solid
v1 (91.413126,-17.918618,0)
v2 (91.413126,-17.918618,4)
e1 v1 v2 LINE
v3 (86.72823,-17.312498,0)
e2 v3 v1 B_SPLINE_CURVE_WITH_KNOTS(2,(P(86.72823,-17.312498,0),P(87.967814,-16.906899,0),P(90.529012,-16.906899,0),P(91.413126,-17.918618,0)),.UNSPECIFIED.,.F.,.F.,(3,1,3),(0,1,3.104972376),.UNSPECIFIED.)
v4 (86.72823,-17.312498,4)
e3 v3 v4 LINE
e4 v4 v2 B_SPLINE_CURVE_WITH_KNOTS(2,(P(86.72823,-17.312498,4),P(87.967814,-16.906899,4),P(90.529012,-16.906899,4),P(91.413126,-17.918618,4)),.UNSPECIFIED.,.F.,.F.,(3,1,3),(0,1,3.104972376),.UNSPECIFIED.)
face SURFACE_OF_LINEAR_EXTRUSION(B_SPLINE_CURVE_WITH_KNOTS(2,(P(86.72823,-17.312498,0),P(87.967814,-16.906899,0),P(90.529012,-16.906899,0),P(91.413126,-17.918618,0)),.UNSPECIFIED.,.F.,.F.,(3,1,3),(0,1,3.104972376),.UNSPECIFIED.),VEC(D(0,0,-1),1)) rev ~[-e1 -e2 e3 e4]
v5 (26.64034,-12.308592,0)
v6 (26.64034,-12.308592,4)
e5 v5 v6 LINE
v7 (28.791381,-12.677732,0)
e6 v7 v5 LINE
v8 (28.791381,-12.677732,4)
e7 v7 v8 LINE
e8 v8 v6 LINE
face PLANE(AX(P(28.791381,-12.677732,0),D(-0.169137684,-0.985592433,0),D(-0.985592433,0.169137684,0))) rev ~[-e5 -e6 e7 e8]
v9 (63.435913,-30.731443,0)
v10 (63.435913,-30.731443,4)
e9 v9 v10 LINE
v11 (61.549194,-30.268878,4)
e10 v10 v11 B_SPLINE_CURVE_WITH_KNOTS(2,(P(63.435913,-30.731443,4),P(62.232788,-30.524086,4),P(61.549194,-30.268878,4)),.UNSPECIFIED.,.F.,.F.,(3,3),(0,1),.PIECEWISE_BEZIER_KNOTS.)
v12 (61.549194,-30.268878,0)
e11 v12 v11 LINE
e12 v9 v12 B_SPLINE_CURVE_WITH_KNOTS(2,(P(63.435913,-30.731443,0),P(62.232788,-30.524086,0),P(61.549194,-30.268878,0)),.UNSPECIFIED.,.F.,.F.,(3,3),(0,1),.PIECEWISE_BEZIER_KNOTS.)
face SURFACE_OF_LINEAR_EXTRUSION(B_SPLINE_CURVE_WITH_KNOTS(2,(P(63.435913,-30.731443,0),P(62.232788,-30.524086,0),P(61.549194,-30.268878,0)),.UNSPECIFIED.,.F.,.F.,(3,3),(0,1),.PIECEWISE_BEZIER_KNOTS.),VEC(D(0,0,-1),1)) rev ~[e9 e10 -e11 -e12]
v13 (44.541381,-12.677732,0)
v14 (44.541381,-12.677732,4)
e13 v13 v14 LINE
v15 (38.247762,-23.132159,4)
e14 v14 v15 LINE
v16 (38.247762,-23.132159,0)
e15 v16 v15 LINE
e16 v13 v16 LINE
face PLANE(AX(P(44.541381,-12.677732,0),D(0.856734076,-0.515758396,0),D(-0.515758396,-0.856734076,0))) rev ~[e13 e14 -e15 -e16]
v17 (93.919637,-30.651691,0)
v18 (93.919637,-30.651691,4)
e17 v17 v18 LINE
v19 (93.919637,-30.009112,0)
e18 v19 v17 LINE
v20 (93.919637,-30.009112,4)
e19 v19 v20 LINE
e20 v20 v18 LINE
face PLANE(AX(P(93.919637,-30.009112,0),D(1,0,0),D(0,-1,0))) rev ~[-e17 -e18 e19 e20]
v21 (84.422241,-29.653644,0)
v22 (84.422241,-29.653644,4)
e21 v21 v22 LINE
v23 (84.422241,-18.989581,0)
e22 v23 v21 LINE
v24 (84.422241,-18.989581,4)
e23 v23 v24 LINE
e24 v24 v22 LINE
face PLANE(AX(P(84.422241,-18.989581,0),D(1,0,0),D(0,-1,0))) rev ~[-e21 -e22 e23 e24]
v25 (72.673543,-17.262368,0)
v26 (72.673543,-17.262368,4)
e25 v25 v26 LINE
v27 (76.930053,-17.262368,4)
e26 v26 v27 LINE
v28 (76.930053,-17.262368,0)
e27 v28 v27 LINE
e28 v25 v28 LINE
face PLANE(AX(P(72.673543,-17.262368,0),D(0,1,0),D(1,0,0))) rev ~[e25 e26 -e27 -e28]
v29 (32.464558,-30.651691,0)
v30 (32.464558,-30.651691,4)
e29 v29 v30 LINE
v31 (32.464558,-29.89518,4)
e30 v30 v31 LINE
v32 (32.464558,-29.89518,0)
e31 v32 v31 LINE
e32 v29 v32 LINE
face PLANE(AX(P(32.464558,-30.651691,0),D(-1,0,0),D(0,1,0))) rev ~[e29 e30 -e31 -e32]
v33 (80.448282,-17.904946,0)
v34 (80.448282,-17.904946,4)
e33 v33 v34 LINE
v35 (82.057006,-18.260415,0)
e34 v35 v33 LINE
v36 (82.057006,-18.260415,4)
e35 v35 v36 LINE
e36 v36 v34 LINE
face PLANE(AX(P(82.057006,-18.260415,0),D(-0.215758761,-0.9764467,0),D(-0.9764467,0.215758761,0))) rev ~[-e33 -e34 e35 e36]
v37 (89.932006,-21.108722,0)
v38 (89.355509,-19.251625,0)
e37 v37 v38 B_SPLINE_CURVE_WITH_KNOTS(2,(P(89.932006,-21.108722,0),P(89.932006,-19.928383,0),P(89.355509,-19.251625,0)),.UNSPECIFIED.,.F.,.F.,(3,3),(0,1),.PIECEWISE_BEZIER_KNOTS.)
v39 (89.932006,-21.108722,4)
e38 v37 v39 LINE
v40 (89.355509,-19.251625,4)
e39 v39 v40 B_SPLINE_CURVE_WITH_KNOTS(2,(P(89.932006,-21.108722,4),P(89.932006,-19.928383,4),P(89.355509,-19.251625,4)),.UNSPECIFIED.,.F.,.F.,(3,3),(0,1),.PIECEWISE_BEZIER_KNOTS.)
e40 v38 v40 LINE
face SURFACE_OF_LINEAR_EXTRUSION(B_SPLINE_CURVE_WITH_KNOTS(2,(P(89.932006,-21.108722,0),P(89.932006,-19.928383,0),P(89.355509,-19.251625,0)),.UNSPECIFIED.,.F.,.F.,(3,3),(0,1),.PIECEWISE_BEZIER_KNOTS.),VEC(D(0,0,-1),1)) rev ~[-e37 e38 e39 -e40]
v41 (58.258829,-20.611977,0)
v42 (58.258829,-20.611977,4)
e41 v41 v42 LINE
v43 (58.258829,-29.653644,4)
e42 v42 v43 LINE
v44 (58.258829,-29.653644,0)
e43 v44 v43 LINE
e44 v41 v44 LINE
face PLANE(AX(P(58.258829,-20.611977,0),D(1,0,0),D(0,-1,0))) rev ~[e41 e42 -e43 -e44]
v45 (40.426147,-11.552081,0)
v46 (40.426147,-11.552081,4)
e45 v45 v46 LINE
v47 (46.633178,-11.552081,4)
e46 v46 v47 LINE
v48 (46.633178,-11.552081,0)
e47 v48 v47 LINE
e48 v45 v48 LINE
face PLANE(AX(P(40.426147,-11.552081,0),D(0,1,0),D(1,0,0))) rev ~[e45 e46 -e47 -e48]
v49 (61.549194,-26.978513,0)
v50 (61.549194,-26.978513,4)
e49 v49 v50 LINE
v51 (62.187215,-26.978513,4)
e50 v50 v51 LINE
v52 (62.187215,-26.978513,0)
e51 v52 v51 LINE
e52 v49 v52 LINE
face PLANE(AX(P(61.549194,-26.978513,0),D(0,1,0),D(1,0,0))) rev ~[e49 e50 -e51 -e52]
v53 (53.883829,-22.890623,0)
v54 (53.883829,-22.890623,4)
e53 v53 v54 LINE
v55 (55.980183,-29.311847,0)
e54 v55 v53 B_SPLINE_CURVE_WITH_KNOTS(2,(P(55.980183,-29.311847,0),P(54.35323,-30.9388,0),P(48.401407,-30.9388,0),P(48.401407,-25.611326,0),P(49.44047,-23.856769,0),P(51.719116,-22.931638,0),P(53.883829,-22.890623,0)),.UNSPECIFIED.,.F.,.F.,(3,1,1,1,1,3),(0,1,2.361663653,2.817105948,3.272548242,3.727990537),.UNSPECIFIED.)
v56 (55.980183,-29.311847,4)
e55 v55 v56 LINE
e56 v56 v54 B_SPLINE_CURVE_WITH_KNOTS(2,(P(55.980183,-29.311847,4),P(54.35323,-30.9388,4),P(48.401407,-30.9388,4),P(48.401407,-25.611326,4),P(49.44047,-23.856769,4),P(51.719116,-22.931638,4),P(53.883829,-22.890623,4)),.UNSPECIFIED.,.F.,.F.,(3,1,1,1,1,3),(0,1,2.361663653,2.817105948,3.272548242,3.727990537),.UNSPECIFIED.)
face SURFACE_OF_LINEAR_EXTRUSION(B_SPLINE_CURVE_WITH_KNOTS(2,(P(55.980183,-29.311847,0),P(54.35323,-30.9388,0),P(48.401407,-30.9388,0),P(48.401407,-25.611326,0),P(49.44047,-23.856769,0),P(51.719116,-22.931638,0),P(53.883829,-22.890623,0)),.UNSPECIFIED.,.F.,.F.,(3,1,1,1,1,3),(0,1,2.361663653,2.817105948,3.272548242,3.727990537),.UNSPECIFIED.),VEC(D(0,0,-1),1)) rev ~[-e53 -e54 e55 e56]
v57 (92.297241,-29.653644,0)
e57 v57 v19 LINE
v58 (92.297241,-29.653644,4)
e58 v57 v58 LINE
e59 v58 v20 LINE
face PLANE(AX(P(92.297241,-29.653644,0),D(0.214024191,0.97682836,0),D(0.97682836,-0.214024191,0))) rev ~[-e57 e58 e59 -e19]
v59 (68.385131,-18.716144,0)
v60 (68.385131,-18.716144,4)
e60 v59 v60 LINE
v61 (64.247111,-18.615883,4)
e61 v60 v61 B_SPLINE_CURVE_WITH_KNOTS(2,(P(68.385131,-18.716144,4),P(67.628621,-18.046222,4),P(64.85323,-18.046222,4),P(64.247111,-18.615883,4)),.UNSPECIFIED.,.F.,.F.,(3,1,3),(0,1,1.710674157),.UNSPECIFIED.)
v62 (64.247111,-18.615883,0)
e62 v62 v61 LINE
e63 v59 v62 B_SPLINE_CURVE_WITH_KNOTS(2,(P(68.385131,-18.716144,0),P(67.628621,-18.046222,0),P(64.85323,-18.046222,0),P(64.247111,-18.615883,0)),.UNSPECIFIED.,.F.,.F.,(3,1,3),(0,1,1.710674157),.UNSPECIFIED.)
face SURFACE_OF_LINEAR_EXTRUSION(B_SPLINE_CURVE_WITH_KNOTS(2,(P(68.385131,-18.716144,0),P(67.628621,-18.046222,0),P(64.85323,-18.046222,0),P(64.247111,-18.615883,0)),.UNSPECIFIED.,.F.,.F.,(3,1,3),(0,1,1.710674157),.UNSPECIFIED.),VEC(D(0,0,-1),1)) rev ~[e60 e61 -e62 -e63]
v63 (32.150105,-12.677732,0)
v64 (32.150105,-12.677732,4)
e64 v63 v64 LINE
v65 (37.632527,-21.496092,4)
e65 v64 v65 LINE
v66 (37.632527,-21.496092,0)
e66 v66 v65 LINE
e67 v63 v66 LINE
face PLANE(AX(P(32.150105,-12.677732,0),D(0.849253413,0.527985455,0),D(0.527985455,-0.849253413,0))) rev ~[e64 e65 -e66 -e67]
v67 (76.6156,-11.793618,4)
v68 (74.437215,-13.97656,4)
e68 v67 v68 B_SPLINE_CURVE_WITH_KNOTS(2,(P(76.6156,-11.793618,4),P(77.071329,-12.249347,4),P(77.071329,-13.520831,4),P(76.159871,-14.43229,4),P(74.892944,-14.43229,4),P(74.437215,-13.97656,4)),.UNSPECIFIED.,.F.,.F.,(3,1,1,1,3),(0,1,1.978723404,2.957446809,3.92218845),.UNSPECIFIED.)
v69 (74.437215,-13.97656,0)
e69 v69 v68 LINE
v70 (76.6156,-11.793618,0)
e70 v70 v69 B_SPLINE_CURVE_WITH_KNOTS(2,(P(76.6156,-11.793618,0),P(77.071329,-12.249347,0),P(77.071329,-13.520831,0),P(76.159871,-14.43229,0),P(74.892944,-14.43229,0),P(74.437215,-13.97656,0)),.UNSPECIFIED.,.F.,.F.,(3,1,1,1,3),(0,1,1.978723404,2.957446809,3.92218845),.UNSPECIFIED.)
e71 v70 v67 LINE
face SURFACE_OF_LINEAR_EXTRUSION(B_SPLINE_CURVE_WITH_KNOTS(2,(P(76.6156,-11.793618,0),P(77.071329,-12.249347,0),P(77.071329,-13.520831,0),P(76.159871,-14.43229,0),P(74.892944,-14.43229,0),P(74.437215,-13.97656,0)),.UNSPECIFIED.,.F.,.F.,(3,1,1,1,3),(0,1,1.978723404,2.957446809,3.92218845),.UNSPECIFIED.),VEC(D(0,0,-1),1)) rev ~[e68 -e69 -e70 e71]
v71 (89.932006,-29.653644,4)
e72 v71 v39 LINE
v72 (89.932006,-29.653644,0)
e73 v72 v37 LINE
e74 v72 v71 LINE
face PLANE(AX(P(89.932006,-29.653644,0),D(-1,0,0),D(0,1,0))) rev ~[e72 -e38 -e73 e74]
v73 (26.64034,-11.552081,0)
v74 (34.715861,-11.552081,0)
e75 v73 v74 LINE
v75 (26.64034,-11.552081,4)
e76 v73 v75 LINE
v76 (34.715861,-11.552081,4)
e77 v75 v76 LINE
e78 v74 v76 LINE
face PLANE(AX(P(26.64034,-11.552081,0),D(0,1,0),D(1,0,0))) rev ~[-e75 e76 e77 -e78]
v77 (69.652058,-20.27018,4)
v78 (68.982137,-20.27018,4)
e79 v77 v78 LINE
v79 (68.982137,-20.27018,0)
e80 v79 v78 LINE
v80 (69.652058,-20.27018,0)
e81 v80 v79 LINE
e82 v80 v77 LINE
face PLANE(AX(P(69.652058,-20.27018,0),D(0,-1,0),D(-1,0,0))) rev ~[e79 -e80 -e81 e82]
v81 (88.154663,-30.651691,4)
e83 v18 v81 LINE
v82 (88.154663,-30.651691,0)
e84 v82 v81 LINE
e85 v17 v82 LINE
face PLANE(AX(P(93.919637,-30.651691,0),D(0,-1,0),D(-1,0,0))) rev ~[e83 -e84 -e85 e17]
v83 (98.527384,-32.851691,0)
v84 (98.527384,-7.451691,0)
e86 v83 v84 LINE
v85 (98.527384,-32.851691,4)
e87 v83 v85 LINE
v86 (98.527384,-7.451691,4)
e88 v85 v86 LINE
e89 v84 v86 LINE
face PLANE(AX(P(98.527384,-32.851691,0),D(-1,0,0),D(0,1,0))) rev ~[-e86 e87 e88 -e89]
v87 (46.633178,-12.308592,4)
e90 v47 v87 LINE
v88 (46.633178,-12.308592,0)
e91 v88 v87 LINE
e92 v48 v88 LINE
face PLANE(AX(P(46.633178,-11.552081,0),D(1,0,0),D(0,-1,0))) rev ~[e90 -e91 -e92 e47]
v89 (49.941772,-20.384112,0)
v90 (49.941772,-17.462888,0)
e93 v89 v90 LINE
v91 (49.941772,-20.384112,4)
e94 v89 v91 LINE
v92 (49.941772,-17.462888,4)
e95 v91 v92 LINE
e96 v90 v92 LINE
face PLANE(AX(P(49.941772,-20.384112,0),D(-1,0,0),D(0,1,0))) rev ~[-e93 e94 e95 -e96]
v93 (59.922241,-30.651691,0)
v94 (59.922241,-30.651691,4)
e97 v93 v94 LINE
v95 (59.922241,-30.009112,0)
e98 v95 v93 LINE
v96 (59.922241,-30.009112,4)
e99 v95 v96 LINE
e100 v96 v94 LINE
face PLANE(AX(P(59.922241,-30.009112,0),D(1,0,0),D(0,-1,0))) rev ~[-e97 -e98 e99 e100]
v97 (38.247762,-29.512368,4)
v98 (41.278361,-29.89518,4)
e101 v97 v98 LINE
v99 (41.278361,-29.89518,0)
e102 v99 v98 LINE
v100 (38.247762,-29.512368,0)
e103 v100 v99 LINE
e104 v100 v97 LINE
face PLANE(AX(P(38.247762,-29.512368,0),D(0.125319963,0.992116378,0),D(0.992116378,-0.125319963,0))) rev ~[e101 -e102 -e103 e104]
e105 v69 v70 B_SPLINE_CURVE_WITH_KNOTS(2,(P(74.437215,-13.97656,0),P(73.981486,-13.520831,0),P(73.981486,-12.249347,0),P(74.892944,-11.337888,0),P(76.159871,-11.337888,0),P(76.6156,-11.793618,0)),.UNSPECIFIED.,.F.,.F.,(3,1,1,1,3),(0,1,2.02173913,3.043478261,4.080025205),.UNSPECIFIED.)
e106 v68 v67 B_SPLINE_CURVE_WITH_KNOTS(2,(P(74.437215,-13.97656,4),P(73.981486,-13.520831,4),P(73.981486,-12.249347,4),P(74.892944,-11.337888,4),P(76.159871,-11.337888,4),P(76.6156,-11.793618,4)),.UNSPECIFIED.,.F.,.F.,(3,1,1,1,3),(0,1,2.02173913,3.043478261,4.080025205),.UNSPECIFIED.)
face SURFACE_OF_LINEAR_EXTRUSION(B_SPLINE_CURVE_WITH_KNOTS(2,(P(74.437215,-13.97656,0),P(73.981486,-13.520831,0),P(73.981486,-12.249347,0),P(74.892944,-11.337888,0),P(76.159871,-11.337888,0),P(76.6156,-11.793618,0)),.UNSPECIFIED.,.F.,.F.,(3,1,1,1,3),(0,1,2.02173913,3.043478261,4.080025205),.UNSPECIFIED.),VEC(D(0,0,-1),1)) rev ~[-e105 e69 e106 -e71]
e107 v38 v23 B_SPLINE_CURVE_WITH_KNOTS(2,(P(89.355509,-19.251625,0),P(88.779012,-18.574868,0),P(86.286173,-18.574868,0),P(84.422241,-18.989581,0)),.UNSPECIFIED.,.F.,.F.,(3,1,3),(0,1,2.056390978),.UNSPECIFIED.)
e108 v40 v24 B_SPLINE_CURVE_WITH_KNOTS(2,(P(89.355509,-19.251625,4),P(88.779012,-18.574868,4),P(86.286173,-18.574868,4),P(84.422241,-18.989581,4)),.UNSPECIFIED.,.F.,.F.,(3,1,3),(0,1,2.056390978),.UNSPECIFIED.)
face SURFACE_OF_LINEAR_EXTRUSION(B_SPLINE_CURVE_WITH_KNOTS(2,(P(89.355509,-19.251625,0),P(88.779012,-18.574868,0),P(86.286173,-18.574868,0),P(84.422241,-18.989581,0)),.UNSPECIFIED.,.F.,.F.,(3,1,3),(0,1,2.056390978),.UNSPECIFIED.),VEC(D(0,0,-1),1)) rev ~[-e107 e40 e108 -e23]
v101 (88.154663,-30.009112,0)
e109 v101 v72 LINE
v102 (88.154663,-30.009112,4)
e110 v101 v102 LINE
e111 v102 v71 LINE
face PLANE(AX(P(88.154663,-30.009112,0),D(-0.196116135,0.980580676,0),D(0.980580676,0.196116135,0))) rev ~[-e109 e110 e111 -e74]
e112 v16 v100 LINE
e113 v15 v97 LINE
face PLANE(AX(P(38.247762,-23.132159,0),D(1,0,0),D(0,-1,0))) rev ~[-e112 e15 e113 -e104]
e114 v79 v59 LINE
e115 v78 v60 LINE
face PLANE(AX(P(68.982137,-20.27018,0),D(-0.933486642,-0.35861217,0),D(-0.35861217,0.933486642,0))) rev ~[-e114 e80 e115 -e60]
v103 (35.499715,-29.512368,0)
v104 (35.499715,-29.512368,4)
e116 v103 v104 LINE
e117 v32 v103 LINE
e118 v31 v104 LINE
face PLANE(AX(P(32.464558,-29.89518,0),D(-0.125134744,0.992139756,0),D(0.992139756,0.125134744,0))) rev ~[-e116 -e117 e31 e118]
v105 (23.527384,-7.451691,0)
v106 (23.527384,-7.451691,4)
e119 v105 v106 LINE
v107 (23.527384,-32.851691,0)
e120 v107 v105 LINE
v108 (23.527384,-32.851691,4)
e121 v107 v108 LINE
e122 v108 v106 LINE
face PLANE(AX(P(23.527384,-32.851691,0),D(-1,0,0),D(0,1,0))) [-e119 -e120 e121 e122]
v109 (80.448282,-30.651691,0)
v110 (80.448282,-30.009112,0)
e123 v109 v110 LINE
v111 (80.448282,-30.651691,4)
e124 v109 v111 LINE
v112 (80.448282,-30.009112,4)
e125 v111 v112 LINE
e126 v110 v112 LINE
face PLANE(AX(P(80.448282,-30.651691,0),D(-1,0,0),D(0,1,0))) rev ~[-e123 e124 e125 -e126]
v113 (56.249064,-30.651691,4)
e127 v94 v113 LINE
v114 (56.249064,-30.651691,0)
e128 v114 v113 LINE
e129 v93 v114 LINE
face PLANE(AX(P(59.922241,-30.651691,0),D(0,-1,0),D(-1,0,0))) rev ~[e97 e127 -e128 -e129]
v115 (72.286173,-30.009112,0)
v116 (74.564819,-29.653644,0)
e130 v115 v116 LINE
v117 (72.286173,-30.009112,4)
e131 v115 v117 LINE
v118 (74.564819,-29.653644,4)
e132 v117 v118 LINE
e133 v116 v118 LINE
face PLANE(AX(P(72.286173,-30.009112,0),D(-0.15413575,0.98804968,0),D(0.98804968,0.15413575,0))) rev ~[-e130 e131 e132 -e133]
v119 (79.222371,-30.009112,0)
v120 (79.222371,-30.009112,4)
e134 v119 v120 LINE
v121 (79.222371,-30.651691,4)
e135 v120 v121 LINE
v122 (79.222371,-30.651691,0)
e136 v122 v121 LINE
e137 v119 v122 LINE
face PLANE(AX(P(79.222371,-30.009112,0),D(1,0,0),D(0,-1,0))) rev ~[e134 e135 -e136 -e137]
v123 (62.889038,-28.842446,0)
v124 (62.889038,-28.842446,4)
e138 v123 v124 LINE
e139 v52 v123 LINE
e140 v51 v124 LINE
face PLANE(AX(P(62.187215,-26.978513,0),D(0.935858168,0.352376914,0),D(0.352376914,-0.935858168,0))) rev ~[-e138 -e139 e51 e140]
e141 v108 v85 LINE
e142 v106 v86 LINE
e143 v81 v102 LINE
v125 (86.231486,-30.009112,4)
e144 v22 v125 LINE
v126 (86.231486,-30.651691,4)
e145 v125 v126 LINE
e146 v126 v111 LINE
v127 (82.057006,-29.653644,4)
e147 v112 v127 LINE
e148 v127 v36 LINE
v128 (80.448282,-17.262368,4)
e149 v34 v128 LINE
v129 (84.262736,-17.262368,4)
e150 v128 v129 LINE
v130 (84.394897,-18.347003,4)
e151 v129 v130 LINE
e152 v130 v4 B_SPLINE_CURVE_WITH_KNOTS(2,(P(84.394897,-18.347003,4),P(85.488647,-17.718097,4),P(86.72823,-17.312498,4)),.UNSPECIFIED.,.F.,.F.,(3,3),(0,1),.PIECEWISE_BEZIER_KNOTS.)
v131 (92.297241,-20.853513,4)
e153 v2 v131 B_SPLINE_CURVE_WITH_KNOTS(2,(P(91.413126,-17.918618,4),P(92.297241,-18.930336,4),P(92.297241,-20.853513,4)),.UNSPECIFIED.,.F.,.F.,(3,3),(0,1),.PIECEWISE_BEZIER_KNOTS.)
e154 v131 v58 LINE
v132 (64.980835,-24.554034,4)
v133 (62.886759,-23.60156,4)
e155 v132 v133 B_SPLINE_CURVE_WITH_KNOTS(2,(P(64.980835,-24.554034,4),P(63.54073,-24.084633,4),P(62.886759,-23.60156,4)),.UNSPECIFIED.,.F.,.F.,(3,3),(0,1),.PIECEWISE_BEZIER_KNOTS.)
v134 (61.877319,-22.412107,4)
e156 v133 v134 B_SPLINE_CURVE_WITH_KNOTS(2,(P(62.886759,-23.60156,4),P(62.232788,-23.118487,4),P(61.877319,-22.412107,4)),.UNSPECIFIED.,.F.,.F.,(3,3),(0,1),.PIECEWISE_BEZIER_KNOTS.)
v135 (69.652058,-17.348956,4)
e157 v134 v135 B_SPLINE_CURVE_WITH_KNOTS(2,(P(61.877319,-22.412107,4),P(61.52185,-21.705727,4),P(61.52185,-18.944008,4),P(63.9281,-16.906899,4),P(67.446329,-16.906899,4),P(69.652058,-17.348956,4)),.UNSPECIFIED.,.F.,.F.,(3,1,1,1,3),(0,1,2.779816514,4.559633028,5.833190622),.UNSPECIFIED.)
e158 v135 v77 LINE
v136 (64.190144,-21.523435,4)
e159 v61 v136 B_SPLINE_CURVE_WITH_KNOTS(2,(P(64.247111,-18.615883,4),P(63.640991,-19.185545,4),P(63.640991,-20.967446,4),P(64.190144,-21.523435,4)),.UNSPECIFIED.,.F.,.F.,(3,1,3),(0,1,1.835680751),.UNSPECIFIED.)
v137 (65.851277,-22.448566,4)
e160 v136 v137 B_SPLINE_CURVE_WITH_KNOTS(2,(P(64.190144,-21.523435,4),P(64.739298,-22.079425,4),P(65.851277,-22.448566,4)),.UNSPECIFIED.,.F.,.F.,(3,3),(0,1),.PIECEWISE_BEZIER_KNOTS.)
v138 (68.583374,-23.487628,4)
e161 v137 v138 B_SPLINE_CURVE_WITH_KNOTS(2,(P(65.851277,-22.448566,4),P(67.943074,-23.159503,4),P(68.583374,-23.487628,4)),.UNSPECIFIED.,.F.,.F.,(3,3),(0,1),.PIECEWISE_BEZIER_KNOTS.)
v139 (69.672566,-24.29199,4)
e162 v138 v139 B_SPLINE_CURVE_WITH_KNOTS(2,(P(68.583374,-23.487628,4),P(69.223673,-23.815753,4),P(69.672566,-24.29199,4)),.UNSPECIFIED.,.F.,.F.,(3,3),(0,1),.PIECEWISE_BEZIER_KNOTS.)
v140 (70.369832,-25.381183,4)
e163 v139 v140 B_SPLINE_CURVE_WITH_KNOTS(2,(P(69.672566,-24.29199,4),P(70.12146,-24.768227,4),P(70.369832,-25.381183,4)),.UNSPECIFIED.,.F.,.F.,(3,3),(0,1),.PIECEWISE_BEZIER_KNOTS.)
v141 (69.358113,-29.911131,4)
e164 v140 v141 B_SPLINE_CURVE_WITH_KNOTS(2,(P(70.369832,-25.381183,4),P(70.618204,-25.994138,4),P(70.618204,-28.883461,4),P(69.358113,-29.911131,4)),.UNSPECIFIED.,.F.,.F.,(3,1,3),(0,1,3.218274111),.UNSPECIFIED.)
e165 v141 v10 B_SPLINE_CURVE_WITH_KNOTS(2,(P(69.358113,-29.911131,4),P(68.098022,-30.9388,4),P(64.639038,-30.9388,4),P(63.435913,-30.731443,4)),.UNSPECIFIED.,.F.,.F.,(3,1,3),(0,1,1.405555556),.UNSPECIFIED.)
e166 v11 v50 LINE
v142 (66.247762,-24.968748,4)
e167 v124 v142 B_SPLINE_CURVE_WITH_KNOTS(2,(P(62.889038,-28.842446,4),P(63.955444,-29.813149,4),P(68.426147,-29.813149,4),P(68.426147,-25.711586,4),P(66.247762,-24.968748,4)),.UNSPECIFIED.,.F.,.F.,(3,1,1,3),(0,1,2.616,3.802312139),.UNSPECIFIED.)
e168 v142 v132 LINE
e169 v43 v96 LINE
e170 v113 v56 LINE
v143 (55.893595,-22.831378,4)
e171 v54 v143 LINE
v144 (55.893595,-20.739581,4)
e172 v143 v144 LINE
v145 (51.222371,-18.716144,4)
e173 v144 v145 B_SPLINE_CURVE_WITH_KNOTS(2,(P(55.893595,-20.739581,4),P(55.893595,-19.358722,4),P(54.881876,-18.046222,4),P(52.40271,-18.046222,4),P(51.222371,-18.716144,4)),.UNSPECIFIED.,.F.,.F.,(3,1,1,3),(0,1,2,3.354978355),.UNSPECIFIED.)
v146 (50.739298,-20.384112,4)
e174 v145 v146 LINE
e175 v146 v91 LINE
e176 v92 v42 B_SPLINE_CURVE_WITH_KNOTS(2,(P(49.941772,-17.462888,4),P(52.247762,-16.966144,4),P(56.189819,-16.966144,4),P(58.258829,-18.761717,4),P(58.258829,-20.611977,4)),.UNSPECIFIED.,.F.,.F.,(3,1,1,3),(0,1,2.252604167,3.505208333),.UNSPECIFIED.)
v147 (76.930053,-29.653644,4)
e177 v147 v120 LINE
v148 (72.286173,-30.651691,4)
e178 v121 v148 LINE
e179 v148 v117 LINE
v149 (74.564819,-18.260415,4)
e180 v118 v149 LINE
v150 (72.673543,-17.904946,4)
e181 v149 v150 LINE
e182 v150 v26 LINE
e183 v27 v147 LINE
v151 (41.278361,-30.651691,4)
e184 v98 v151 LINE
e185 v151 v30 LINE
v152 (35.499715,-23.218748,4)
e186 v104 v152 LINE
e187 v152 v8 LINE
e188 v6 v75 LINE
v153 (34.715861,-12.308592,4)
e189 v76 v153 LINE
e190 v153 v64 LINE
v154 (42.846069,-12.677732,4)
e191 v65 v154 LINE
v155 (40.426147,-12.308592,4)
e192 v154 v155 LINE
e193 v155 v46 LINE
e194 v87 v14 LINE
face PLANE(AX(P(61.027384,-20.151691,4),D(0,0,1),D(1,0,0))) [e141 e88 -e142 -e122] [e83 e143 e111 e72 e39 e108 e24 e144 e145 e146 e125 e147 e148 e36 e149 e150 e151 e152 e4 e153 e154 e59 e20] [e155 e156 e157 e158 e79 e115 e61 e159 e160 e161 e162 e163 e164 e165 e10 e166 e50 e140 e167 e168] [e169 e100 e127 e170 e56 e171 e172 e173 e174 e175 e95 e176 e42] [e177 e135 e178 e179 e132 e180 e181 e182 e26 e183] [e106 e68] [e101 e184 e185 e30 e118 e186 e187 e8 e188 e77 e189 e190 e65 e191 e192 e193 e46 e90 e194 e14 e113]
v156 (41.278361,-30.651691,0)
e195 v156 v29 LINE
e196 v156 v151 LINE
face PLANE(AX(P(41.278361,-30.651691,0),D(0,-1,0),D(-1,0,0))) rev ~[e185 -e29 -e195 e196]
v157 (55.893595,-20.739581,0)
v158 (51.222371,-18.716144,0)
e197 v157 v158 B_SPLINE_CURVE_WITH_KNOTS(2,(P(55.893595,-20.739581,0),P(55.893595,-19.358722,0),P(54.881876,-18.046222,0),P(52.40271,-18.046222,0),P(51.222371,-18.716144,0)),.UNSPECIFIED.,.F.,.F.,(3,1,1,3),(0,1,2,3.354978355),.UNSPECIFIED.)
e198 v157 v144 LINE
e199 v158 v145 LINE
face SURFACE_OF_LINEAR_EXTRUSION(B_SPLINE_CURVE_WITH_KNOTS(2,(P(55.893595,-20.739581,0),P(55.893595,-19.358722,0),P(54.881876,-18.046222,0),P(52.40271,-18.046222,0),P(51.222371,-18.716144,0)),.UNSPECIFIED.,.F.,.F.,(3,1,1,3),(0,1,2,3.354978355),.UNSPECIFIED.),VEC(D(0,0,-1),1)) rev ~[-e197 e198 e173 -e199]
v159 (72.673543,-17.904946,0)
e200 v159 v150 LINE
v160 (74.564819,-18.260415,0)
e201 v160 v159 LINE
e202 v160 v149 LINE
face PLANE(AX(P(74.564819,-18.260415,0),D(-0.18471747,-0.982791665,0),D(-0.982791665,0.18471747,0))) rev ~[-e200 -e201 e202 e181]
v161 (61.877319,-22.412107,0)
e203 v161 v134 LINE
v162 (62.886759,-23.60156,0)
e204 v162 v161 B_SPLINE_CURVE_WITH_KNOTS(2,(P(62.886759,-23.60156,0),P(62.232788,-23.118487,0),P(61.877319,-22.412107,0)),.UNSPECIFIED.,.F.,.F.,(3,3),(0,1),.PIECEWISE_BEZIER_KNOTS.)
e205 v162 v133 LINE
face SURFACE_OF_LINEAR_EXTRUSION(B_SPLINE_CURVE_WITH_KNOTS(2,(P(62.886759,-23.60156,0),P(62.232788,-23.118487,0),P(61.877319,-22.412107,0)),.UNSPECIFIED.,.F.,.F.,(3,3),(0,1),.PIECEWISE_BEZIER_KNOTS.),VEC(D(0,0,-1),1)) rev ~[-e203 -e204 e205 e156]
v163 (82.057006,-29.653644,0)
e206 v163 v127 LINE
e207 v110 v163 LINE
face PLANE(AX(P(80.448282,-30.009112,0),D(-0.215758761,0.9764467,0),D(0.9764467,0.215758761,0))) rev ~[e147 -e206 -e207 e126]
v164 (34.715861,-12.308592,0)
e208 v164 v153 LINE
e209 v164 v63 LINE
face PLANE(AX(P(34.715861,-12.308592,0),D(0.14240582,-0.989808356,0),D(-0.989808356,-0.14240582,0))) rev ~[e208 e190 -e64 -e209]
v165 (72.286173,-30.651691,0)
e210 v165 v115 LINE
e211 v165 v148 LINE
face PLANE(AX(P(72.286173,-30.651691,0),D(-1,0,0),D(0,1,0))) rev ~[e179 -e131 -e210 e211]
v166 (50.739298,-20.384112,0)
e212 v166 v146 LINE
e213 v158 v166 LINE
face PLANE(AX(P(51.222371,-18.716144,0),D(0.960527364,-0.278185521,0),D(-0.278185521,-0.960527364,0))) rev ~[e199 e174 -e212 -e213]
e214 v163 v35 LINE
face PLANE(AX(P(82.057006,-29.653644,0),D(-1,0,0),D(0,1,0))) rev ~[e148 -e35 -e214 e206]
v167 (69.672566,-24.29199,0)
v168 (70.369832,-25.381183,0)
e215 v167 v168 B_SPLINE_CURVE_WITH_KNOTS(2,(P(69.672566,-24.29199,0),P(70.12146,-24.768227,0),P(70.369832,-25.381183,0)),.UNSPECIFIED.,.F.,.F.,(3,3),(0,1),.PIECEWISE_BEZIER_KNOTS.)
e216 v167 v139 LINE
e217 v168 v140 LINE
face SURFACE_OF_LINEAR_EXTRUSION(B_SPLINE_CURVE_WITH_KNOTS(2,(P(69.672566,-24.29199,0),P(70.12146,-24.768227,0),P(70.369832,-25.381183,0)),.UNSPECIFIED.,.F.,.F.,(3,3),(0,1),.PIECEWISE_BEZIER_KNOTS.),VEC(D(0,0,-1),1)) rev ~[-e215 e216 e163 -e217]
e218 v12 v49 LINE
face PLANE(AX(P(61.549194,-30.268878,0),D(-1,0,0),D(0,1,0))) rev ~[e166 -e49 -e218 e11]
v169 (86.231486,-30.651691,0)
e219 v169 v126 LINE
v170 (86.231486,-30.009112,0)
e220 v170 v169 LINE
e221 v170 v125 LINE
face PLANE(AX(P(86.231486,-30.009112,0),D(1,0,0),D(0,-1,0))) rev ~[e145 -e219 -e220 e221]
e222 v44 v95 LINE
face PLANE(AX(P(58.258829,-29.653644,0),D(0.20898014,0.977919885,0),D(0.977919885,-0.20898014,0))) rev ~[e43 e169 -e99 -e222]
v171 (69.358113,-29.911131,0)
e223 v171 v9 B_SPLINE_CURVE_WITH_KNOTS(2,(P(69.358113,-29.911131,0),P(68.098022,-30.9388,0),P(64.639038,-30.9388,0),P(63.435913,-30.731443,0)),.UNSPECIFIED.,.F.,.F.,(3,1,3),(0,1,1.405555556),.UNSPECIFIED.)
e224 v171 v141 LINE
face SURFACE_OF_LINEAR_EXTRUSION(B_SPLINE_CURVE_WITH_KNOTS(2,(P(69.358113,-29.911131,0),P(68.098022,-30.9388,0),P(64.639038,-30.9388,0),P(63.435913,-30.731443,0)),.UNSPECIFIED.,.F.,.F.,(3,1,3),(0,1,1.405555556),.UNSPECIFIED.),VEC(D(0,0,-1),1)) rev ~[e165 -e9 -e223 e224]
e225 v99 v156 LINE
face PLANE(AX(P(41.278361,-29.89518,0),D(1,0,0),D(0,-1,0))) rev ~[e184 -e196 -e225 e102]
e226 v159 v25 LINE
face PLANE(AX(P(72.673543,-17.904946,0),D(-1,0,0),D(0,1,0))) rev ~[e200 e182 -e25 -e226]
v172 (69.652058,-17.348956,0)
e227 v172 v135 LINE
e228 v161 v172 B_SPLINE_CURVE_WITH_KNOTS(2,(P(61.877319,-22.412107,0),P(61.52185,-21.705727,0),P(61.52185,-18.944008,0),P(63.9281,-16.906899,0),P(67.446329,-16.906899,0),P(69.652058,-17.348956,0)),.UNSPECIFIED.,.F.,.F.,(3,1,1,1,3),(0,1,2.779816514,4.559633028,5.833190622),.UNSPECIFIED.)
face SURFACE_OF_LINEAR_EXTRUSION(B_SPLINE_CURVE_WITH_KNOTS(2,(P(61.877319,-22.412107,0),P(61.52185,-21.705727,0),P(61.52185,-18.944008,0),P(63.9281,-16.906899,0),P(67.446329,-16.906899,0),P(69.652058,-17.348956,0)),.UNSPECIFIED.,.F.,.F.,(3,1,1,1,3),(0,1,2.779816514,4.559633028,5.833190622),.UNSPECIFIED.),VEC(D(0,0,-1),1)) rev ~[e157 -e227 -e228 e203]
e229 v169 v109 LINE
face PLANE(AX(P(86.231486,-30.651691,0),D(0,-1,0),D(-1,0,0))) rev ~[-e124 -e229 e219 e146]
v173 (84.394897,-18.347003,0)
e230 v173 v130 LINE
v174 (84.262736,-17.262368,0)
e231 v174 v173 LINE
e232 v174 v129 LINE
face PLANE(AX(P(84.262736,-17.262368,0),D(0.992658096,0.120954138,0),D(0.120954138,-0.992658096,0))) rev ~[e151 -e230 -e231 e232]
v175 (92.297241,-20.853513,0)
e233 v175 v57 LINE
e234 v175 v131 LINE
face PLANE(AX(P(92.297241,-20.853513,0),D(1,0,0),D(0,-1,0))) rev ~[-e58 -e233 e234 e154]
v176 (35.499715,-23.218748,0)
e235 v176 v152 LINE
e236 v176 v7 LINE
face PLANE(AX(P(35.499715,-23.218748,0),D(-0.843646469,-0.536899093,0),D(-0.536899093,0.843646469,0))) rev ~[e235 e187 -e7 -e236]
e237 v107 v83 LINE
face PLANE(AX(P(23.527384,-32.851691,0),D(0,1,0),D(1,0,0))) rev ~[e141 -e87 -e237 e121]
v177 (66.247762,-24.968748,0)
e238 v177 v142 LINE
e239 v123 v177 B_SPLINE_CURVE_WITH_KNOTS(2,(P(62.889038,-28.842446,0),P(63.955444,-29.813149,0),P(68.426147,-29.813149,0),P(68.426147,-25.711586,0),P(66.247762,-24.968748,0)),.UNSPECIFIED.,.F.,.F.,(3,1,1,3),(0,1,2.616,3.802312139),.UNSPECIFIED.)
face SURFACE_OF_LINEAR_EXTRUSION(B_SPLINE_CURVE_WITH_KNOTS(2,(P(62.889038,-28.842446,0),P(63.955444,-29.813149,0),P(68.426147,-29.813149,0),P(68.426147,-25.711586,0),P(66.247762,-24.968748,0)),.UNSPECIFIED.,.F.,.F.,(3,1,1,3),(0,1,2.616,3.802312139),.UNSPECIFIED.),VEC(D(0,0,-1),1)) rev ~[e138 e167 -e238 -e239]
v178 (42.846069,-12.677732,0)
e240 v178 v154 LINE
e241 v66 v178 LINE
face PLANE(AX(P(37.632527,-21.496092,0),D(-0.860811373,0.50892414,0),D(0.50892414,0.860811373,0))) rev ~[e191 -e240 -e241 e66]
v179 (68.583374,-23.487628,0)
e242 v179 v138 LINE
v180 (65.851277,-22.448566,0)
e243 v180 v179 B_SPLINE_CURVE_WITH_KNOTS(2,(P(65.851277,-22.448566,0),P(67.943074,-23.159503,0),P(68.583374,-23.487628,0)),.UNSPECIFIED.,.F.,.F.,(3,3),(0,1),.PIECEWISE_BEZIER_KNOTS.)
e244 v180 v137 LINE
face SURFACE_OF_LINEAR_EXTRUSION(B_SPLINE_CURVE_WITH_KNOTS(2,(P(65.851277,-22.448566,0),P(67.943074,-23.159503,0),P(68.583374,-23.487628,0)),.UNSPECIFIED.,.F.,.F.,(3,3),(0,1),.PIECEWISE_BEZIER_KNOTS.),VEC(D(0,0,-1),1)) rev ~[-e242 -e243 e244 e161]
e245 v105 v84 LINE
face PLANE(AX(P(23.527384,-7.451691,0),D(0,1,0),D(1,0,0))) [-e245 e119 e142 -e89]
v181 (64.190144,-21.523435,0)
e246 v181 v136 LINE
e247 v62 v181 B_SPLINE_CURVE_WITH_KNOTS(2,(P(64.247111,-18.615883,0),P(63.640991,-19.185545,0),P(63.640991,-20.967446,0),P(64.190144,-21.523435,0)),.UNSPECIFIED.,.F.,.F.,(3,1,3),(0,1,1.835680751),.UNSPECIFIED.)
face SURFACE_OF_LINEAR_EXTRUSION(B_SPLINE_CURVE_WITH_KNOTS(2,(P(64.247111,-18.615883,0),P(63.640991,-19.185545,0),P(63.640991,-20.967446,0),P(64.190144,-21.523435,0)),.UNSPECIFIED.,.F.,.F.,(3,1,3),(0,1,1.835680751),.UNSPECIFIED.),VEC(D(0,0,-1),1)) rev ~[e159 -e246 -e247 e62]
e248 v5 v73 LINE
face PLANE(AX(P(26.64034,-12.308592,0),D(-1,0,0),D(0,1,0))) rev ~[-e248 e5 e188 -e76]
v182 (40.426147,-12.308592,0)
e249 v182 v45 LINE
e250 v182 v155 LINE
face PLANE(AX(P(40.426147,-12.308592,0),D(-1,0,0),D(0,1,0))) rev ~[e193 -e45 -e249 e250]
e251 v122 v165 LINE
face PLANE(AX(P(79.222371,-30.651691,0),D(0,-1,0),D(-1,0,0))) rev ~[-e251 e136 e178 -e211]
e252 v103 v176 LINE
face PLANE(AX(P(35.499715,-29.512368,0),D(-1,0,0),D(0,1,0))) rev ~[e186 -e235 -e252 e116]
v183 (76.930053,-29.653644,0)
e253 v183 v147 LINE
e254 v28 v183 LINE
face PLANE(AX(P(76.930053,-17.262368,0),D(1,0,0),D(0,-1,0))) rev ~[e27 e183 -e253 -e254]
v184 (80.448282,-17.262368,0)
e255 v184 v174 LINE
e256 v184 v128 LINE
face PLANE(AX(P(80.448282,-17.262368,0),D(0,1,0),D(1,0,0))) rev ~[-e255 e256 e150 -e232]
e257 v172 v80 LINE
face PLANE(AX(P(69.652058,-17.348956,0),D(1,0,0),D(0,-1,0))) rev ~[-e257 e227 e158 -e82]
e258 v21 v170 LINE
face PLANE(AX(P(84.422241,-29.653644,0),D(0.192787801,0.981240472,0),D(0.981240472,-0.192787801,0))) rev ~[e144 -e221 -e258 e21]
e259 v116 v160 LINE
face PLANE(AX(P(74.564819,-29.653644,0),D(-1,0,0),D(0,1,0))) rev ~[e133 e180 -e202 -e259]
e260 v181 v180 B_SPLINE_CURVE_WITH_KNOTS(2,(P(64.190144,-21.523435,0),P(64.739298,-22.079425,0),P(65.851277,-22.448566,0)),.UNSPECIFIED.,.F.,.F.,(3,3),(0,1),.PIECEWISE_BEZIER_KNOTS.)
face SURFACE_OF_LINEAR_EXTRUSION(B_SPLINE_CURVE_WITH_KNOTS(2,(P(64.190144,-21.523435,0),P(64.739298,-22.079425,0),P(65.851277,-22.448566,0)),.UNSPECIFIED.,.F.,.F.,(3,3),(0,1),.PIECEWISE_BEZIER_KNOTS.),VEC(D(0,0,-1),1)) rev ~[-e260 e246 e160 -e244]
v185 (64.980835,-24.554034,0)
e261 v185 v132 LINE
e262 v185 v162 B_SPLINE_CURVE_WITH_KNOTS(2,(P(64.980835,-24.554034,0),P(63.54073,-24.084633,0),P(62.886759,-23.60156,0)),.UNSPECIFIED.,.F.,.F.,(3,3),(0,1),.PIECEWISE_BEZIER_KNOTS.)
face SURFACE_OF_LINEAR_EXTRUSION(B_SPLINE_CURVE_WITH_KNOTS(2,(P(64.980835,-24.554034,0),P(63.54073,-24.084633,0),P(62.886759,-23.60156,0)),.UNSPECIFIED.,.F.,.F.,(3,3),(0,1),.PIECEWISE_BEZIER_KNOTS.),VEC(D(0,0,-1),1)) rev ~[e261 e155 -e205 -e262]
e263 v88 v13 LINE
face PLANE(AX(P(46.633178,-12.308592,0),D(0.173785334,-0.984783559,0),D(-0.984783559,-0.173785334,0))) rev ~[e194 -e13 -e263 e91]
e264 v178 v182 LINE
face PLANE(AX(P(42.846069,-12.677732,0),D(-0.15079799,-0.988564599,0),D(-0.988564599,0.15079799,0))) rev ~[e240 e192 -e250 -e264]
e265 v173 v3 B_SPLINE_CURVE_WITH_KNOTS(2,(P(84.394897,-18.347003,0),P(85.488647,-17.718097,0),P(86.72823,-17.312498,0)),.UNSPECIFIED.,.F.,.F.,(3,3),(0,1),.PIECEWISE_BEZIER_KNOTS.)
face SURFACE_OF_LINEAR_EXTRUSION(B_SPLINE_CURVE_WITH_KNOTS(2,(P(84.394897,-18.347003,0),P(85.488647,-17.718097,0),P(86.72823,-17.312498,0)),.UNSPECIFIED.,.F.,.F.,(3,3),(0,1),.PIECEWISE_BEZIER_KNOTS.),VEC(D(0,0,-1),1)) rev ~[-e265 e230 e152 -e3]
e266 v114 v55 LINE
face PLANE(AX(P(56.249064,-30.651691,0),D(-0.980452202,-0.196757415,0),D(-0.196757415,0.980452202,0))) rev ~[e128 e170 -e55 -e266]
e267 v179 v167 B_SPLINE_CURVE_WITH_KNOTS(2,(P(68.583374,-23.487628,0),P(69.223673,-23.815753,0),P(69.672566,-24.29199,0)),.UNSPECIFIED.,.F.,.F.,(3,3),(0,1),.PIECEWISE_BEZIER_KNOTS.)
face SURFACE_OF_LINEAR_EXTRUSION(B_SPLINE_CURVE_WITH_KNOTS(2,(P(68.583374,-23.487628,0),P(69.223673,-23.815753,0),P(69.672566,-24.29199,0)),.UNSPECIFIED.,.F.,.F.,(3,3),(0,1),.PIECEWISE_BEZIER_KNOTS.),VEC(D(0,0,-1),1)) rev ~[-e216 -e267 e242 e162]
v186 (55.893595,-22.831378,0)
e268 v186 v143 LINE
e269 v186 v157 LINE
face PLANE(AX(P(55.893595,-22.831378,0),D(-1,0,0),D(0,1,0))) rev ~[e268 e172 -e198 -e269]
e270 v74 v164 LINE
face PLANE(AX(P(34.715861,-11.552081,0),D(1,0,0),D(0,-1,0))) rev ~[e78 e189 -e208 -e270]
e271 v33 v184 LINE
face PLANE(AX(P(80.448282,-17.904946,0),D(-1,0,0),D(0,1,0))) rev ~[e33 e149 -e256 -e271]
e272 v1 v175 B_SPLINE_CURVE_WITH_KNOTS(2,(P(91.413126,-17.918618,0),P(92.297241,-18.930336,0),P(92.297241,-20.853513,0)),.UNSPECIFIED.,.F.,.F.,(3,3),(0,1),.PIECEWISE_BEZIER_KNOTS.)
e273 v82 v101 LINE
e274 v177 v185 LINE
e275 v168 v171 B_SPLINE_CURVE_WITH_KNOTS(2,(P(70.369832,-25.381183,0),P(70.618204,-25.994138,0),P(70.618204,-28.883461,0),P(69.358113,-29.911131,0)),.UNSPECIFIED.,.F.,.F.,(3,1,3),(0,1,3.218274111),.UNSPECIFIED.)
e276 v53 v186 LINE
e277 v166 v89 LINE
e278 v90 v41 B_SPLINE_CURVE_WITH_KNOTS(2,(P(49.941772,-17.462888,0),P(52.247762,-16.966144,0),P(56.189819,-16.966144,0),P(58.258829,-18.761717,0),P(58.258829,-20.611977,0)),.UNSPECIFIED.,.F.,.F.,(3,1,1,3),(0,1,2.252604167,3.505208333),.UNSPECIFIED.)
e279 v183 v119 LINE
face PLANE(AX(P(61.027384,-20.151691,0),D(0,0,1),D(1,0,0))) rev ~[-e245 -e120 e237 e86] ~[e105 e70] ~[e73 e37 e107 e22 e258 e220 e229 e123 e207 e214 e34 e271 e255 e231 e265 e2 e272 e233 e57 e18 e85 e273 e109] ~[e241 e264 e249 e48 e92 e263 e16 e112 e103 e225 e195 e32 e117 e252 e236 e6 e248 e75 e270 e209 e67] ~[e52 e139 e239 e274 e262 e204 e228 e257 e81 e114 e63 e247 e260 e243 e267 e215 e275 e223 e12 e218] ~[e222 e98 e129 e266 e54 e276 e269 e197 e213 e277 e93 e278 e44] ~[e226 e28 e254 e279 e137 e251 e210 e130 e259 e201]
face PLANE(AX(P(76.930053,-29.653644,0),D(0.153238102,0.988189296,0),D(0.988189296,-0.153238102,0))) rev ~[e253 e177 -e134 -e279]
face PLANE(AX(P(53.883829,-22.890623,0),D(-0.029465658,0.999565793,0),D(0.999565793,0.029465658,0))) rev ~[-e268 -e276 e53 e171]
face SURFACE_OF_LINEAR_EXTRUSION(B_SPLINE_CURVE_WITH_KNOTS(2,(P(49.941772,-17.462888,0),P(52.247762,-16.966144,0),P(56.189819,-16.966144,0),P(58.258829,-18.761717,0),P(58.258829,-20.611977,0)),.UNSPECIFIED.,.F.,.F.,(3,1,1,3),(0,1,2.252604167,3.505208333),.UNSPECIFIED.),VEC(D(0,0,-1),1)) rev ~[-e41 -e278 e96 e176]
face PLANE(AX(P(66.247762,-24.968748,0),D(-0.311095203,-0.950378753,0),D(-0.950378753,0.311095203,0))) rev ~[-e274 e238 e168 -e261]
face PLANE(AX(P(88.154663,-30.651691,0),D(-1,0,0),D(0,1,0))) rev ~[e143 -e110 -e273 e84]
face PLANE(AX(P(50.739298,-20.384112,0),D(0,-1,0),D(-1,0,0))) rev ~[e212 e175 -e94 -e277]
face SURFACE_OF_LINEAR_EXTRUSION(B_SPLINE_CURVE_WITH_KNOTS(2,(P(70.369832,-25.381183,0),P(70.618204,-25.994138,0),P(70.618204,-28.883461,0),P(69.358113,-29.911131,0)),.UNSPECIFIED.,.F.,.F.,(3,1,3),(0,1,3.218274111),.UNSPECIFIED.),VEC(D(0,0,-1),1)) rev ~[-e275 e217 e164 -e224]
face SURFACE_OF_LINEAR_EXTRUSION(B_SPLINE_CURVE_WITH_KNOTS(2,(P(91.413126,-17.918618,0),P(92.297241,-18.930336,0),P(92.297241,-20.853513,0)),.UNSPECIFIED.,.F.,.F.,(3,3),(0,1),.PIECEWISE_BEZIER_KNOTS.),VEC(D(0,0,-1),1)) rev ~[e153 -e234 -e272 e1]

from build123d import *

# Parameters (mm, degrees)
F0_W     = 75
F0_H     = 25.4
F1_DEPTH = 4


with BuildPart() as f1:
    # F0 (on Top) → F1 (new body)
    with BuildSketch(Plane.XY):
        with Locations((61.0273839791, -20.1516905552)):
            Rectangle(F0_W, F0_H)
        Polygon((44.541381375, -12.6777322218), (38.2477615833, -23.1321593052), (38.2477615833, -29.5123676385), (41.2783605416, -29.8951801385), (41.2783605416, -30.6516905552), (32.4645584583, -30.6516905552), (32.4645584583, -29.8951801385), (35.4997147083, -29.5123676385), (35.4997147083, -23.2187478468), (28.791381375, -12.6777322218), (26.6403397083, -12.3085915968), (26.6403397083, -11.5520811802), (34.7158605416, -11.5520811802), (34.7158605416, -12.3085915968), (32.1501053333, -12.6777322218), (37.6325272083, -21.4960915968), (42.846068875, -12.6777322218), (40.426147, -12.3085915968), (40.426147, -11.5520811802), (46.63317825, -11.5520811802), (46.63317825, -12.3085915968), align=None, mode=Mode.SUBTRACT)
        with BuildLine():
            add(Edge.make_bspline(
                [(49.941772, -17.4628884718), (52.2477615833, -16.9661436802), (53.9977615833, -16.9661436802)],
                knots=[0, 0, 0, 1, 1, 1], degree=2))
            add(Edge.make_bspline(
                [(53.9977615833, -16.9661436802), (56.189818875, -16.9661436802), (57.2243240833, -17.8639301385)],
                knots=[0, 0, 0, 1, 1, 1], degree=2))
            add(Edge.make_bspline(
                [(57.2243240833, -17.8639301385), (58.2588292916, -18.7617165968), (58.2588292916, -20.6119770135)],
                knots=[0, 0, 0, 1, 1, 1], degree=2))
            Line((58.2588292916, -20.6119770135), (58.2588292916, -29.6536436802))
            Line((58.2588292916, -29.6536436802), (59.92224075, -30.0091124302))
            Line((59.92224075, -30.0091124302), (59.92224075, -30.6516905552))
            Line((59.92224075, -30.6516905552), (56.2490636666, -30.6516905552))
            Line((56.2490636666, -30.6516905552), (55.9801834583, -29.3118468052))
            add(Edge.make_bspline(
                [(55.9801834583, -29.3118468052), (54.3532303333, -30.9387999302), (51.8330480416, -30.9387999302)],
                knots=[0, 0, 0, 1, 1, 1], degree=2))
            add(Edge.make_bspline(
                [(51.8330480416, -30.9387999302), (48.4014074166, -30.9387999302), (48.4014074166, -26.9466124302)],
                knots=[0, 0, 0, 1, 1, 1], degree=2))
            add(Edge.make_bspline(
                [(48.4014074166, -26.9466124302), (48.4014074166, -25.6113259718), (48.9209386666, -24.734047326)],
                knots=[0, 0, 0, 1, 1, 1], degree=2))
            add(Edge.make_bspline(
                [(48.9209386666, -24.734047326), (49.4404699166, -23.8567686802), (50.5797928333, -23.394203576)],
                knots=[0, 0, 0, 1, 1, 1], degree=2))
            add(Edge.make_bspline(
                [(50.5797928333, -23.394203576), (51.71911575, -22.9316384718), (53.8838292916, -22.8906228468)],
                knots=[0, 0, 0, 1, 1, 1], degree=2))
            Line((53.8838292916, -22.8906228468), (55.8935949166, -22.8313780552))
            Line((55.8935949166, -22.8313780552), (55.8935949166, -20.7395811802))
            add(Edge.make_bspline(
                [(55.8935949166, -20.7395811802), (55.8935949166, -19.3587218052), (55.3877355416, -18.7024718052)],
                knots=[0, 0, 0, 1, 1, 1], degree=2))
            add(Edge.make_bspline(
                [(55.3877355416, -18.7024718052), (54.8818761666, -18.0462218052), (53.8291417916, -18.0462218052)],
                knots=[0, 0, 0, 1, 1, 1], degree=2))
            add(Edge.make_bspline(
                [(53.8291417916, -18.0462218052), (52.4027095, -18.0462218052), (51.2223709583, -18.7161436802)],
                knots=[0, 0, 0, 1, 1, 1], degree=2))
            Line((51.2223709583, -18.7161436802), (50.7392980416, -20.3841124302))
            Line((50.7392980416, -20.3841124302), (49.941772, -20.3841124302))
            Line((49.941772, -20.3841124302), (49.941772, -17.4628884718))
        make_face(mode=Mode.SUBTRACT)
        with BuildLine():
            add(Edge.make_bspline(
                [(70.3698318958, -25.3811827427), (70.6182042916, -25.9941384718), (70.6182042916, -26.8919249302)],
                knots=[0, 0, 0, 1, 1, 1], degree=2))
            add(Edge.make_bspline(
                [(70.6182042916, -26.8919249302), (70.6182042916, -28.8834613885), (69.3581131458, -29.9111306593)],
                knots=[0, 0, 0, 1, 1, 1], degree=2))
            add(Edge.make_bspline(
                [(69.3581131458, -29.9111306593), (68.098022, -30.9387999302), (65.6370845, -30.9387999302)],
                knots=[0, 0, 0, 1, 1, 1], degree=2))
            add(Edge.make_bspline(
                [(65.6370845, -30.9387999302), (64.639037625, -30.9387999302), (63.435912625, -30.7314431593)],
                knots=[0, 0, 0, 1, 1, 1], degree=2))
            add(Edge.make_bspline(
                [(63.435912625, -30.7314431593), (62.232787625, -30.5240863885), (61.549193875, -30.2688780552)],
                knots=[0, 0, 0, 1, 1, 1], degree=2))
            Line((61.549193875, -30.2688780552), (61.549193875, -26.9785134718))
            Line((61.549193875, -26.9785134718), (62.1872147083, -26.9785134718))
            Line((62.1872147083, -26.9785134718), (62.889037625, -28.8424457635))
            add(Edge.make_bspline(
                [(62.889037625, -28.8424457635), (63.955443875, -29.8131488885), (65.66442825, -29.8131488885)],
                knots=[0, 0, 0, 1, 1, 1], degree=2))
            add(Edge.make_bspline(
                [(65.66442825, -29.8131488885), (68.426147, -29.8131488885), (68.426147, -27.4479145135)],
                knots=[0, 0, 0, 1, 1, 1], degree=2))
            add(Edge.make_bspline(
                [(68.426147, -27.4479145135), (68.426147, -25.7115863885), (66.2477615833, -24.9687478468)],
                knots=[0, 0, 0, 1, 1, 1], degree=2))
            Line((66.2477615833, -24.9687478468), (64.9808345, -24.5540343052))
            add(Edge.make_bspline(
                [(64.9808345, -24.5540343052), (63.5407303333, -24.0846332635), (62.8867589791, -23.6015603468)],
                knots=[0, 0, 0, 1, 1, 1], degree=2))
            add(Edge.make_bspline(
                [(62.8867589791, -23.6015603468), (62.232787625, -23.1184874302), (61.877318875, -22.4121072218)],
                knots=[0, 0, 0, 1, 1, 1], degree=2))
            add(Edge.make_bspline(
                [(61.877318875, -22.4121072218), (61.521850125, -21.7057270135), (61.521850125, -20.7122374302)],
                knots=[0, 0, 0, 1, 1, 1], degree=2))
            add(Edge.make_bspline(
                [(61.521850125, -20.7122374302), (61.521850125, -18.9440082635), (62.724975125, -17.925453576)],
                knots=[0, 0, 0, 1, 1, 1], degree=2))
            add(Edge.make_bspline(
                [(62.724975125, -17.925453576), (63.928100125, -16.9068988885), (65.978881375, -16.9068988885)],
                knots=[0, 0, 0, 1, 1, 1], degree=2))
            add(Edge.make_bspline(
                [(65.978881375, -16.9068988885), (67.4463292916, -16.9068988885), (69.6520584583, -17.3489561802)],
                knots=[0, 0, 0, 1, 1, 1], degree=2))
            Line((69.6520584583, -17.3489561802), (69.6520584583, -20.2701801385))
            Line((69.6520584583, -20.2701801385), (68.9821365833, -20.2701801385))
            Line((68.9821365833, -20.2701801385), (68.385131375, -18.7161436802))
            add(Edge.make_bspline(
                [(68.385131375, -18.7161436802), (67.6286209583, -18.0462218052), (66.006225125, -18.0462218052)],
                knots=[0, 0, 0, 1, 1, 1], degree=2))
            add(Edge.make_bspline(
                [(66.006225125, -18.0462218052), (64.8532303333, -18.0462218052), (64.2471105416, -18.6158832635)],
                knots=[0, 0, 0, 1, 1, 1], degree=2))
            add(Edge.make_bspline(
                [(64.2471105416, -18.6158832635), (63.64099075, -19.1855447218), (63.64099075, -20.1562478468)],
                knots=[0, 0, 0, 1, 1, 1], degree=2))
            add(Edge.make_bspline(
                [(63.64099075, -20.1562478468), (63.64099075, -20.9674457635), (64.1901443958, -21.5234353468)],
                knots=[0, 0, 0, 1, 1, 1], degree=2))
            add(Edge.make_bspline(
                [(64.1901443958, -21.5234353468), (64.7392980416, -22.0794249302), (65.8512772083, -22.4485655552)],
                knots=[0, 0, 0, 1, 1, 1], degree=2))
            add(Edge.make_bspline(
                [(65.8512772083, -22.4485655552), (67.9430740833, -23.1595030552), (68.5833735625, -23.4876280552)],
                knots=[0, 0, 0, 1, 1, 1], degree=2))
            add(Edge.make_bspline(
                [(68.5833735625, -23.4876280552), (69.2236730416, -23.8157530552), (69.6725662708, -24.2919900343)],
                knots=[0, 0, 0, 1, 1, 1], degree=2))
            add(Edge.make_bspline(
                [(69.6725662708, -24.2919900343), (70.1214595, -24.7682270135), (70.3698318958, -25.3811827427)],
                knots=[0, 0, 0, 1, 1, 1], degree=2))
        make_face(mode=Mode.SUBTRACT)
        Polygon((76.93005325, -17.2623676385), (76.93005325, -29.6536436802), (79.2223709583, -30.0091124302), (79.2223709583, -30.6516905552), (72.2861730416, -30.6516905552), (72.2861730416, -30.0091124302), (74.564818875, -29.6536436802), (74.564818875, -18.2604145135), (72.6735428333, -17.9049457635), (72.6735428333, -17.2623676385), align=None, mode=Mode.SUBTRACT)
        with BuildLine():
            Line((84.2627355416, -17.2623676385), (84.394897, -18.3470030552))
            add(Edge.make_bspline(
                [(84.394897, -18.3470030552), (85.488647, -17.7180968052), (86.7282303333, -17.3124978468)],
                knots=[0, 0, 0, 1, 1, 1], degree=2))
            add(Edge.make_bspline(
                [(86.7282303333, -17.3124978468), (87.9678136666, -16.9068988885), (88.7926834583, -16.9068988885)],
                knots=[0, 0, 0, 1, 1, 1], degree=2))
            add(Edge.make_bspline(
                [(88.7926834583, -16.9068988885), (90.5290115833, -16.9068988885), (91.4131261666, -17.9186176385)],
                knots=[0, 0, 0, 1, 1, 1], degree=2))
            add(Edge.make_bspline(
                [(91.4131261666, -17.9186176385), (92.29724075, -18.9303363885), (92.29724075, -20.8535134718)],
                knots=[0, 0, 0, 1, 1, 1], degree=2))
            Line((92.29724075, -20.8535134718), (92.29724075, -29.6536436802))
            Line((92.29724075, -29.6536436802), (93.9196365833, -30.0091124302))
            Line((93.9196365833, -30.0091124302), (93.9196365833, -30.6516905552))
            Line((93.9196365833, -30.6516905552), (88.154662625, -30.6516905552))
            Line((88.154662625, -30.6516905552), (88.154662625, -30.0091124302))
            Line((88.154662625, -30.0091124302), (89.932006375, -29.6536436802))
            Line((89.932006375, -29.6536436802), (89.932006375, -21.1087218052))
            add(Edge.make_bspline(
                [(89.932006375, -21.1087218052), (89.932006375, -19.9283832635), (89.3555089791, -19.251625451)],
                knots=[0, 0, 0, 1, 1, 1], degree=2))
            add(Edge.make_bspline(
                [(89.3555089791, -19.251625451), (88.7790115833, -18.5748676385), (87.566772, -18.5748676385)],
                knots=[0, 0, 0, 1, 1, 1], degree=2))
            add(Edge.make_bspline(
                [(87.566772, -18.5748676385), (86.2861730416, -18.5748676385), (84.42224075, -18.9895811802)],
                knots=[0, 0, 0, 1, 1, 1], degree=2))
            Line((84.42224075, -18.9895811802), (84.42224075, -29.6536436802))
            Line((84.42224075, -29.6536436802), (86.2314855416, -30.0091124302))
            Line((86.2314855416, -30.0091124302), (86.2314855416, -30.6516905552))
            Line((86.2314855416, -30.6516905552), (80.4482824166, -30.6516905552))
            Line((80.4482824166, -30.6516905552), (80.4482824166, -30.0091124302))
            Line((80.4482824166, -30.0091124302), (82.057006375, -29.6536436802))
            Line((82.057006375, -29.6536436802), (82.057006375, -18.2604145135))
            Line((82.057006375, -18.2604145135), (80.4482824166, -17.9049457635))
            Line((80.4482824166, -17.9049457635), (80.4482824166, -17.2623676385))
            Line((80.4482824166, -17.2623676385), (84.2627355416, -17.2623676385))
        make_face(mode=Mode.SUBTRACT)
        with BuildLine():
            add(Edge.make_bspline(
                [(76.615600125, -11.7936176385), (77.0713292916, -12.2493468052), (77.0713292916, -12.8919249302)],
                knots=[0, 0, 0, 1, 1, 1], degree=2))
            add(Edge.make_bspline(
                [(77.0713292916, -12.8919249302), (77.0713292916, -13.5208311802), (76.615600125, -13.9765603468)],
                knots=[0, 0, 0, 1, 1, 1], degree=2))
            add(Edge.make_bspline(
                [(76.615600125, -13.9765603468), (76.1598709583, -14.4322895135), (75.521850125, -14.4322895135)],
                knots=[0, 0, 0, 1, 1, 1], degree=2))
            add(Edge.make_bspline(
                [(75.521850125, -14.4322895135), (74.892943875, -14.4322895135), (74.4372147083, -13.9765603468)],
                knots=[0, 0, 0, 1, 1, 1], degree=2))
            add(Edge.make_bspline(
                [(74.4372147083, -13.9765603468), (73.9814855416, -13.5208311802), (73.9814855416, -12.8919249302)],
                knots=[0, 0, 0, 1, 1, 1], degree=2))
            add(Edge.make_bspline(
                [(73.9814855416, -12.8919249302), (73.9814855416, -12.2493468052), (74.4372147083, -11.7936176385)],
                knots=[0, 0, 0, 1, 1, 1], degree=2))
            add(Edge.make_bspline(
                [(74.4372147083, -11.7936176385), (74.892943875, -11.3378884718), (75.521850125, -11.3378884718)],
                knots=[0, 0, 0, 1, 1, 1], degree=2))
            add(Edge.make_bspline(
                [(75.521850125, -11.3378884718), (76.1598709583, -11.3378884718), (76.615600125, -11.7936176385)],
                knots=[0, 0, 0, 1, 1, 1], degree=2))
        make_face(mode=Mode.SUBTRACT)
    extrude(amount=F1_DEPTH)


solid = f1.part
